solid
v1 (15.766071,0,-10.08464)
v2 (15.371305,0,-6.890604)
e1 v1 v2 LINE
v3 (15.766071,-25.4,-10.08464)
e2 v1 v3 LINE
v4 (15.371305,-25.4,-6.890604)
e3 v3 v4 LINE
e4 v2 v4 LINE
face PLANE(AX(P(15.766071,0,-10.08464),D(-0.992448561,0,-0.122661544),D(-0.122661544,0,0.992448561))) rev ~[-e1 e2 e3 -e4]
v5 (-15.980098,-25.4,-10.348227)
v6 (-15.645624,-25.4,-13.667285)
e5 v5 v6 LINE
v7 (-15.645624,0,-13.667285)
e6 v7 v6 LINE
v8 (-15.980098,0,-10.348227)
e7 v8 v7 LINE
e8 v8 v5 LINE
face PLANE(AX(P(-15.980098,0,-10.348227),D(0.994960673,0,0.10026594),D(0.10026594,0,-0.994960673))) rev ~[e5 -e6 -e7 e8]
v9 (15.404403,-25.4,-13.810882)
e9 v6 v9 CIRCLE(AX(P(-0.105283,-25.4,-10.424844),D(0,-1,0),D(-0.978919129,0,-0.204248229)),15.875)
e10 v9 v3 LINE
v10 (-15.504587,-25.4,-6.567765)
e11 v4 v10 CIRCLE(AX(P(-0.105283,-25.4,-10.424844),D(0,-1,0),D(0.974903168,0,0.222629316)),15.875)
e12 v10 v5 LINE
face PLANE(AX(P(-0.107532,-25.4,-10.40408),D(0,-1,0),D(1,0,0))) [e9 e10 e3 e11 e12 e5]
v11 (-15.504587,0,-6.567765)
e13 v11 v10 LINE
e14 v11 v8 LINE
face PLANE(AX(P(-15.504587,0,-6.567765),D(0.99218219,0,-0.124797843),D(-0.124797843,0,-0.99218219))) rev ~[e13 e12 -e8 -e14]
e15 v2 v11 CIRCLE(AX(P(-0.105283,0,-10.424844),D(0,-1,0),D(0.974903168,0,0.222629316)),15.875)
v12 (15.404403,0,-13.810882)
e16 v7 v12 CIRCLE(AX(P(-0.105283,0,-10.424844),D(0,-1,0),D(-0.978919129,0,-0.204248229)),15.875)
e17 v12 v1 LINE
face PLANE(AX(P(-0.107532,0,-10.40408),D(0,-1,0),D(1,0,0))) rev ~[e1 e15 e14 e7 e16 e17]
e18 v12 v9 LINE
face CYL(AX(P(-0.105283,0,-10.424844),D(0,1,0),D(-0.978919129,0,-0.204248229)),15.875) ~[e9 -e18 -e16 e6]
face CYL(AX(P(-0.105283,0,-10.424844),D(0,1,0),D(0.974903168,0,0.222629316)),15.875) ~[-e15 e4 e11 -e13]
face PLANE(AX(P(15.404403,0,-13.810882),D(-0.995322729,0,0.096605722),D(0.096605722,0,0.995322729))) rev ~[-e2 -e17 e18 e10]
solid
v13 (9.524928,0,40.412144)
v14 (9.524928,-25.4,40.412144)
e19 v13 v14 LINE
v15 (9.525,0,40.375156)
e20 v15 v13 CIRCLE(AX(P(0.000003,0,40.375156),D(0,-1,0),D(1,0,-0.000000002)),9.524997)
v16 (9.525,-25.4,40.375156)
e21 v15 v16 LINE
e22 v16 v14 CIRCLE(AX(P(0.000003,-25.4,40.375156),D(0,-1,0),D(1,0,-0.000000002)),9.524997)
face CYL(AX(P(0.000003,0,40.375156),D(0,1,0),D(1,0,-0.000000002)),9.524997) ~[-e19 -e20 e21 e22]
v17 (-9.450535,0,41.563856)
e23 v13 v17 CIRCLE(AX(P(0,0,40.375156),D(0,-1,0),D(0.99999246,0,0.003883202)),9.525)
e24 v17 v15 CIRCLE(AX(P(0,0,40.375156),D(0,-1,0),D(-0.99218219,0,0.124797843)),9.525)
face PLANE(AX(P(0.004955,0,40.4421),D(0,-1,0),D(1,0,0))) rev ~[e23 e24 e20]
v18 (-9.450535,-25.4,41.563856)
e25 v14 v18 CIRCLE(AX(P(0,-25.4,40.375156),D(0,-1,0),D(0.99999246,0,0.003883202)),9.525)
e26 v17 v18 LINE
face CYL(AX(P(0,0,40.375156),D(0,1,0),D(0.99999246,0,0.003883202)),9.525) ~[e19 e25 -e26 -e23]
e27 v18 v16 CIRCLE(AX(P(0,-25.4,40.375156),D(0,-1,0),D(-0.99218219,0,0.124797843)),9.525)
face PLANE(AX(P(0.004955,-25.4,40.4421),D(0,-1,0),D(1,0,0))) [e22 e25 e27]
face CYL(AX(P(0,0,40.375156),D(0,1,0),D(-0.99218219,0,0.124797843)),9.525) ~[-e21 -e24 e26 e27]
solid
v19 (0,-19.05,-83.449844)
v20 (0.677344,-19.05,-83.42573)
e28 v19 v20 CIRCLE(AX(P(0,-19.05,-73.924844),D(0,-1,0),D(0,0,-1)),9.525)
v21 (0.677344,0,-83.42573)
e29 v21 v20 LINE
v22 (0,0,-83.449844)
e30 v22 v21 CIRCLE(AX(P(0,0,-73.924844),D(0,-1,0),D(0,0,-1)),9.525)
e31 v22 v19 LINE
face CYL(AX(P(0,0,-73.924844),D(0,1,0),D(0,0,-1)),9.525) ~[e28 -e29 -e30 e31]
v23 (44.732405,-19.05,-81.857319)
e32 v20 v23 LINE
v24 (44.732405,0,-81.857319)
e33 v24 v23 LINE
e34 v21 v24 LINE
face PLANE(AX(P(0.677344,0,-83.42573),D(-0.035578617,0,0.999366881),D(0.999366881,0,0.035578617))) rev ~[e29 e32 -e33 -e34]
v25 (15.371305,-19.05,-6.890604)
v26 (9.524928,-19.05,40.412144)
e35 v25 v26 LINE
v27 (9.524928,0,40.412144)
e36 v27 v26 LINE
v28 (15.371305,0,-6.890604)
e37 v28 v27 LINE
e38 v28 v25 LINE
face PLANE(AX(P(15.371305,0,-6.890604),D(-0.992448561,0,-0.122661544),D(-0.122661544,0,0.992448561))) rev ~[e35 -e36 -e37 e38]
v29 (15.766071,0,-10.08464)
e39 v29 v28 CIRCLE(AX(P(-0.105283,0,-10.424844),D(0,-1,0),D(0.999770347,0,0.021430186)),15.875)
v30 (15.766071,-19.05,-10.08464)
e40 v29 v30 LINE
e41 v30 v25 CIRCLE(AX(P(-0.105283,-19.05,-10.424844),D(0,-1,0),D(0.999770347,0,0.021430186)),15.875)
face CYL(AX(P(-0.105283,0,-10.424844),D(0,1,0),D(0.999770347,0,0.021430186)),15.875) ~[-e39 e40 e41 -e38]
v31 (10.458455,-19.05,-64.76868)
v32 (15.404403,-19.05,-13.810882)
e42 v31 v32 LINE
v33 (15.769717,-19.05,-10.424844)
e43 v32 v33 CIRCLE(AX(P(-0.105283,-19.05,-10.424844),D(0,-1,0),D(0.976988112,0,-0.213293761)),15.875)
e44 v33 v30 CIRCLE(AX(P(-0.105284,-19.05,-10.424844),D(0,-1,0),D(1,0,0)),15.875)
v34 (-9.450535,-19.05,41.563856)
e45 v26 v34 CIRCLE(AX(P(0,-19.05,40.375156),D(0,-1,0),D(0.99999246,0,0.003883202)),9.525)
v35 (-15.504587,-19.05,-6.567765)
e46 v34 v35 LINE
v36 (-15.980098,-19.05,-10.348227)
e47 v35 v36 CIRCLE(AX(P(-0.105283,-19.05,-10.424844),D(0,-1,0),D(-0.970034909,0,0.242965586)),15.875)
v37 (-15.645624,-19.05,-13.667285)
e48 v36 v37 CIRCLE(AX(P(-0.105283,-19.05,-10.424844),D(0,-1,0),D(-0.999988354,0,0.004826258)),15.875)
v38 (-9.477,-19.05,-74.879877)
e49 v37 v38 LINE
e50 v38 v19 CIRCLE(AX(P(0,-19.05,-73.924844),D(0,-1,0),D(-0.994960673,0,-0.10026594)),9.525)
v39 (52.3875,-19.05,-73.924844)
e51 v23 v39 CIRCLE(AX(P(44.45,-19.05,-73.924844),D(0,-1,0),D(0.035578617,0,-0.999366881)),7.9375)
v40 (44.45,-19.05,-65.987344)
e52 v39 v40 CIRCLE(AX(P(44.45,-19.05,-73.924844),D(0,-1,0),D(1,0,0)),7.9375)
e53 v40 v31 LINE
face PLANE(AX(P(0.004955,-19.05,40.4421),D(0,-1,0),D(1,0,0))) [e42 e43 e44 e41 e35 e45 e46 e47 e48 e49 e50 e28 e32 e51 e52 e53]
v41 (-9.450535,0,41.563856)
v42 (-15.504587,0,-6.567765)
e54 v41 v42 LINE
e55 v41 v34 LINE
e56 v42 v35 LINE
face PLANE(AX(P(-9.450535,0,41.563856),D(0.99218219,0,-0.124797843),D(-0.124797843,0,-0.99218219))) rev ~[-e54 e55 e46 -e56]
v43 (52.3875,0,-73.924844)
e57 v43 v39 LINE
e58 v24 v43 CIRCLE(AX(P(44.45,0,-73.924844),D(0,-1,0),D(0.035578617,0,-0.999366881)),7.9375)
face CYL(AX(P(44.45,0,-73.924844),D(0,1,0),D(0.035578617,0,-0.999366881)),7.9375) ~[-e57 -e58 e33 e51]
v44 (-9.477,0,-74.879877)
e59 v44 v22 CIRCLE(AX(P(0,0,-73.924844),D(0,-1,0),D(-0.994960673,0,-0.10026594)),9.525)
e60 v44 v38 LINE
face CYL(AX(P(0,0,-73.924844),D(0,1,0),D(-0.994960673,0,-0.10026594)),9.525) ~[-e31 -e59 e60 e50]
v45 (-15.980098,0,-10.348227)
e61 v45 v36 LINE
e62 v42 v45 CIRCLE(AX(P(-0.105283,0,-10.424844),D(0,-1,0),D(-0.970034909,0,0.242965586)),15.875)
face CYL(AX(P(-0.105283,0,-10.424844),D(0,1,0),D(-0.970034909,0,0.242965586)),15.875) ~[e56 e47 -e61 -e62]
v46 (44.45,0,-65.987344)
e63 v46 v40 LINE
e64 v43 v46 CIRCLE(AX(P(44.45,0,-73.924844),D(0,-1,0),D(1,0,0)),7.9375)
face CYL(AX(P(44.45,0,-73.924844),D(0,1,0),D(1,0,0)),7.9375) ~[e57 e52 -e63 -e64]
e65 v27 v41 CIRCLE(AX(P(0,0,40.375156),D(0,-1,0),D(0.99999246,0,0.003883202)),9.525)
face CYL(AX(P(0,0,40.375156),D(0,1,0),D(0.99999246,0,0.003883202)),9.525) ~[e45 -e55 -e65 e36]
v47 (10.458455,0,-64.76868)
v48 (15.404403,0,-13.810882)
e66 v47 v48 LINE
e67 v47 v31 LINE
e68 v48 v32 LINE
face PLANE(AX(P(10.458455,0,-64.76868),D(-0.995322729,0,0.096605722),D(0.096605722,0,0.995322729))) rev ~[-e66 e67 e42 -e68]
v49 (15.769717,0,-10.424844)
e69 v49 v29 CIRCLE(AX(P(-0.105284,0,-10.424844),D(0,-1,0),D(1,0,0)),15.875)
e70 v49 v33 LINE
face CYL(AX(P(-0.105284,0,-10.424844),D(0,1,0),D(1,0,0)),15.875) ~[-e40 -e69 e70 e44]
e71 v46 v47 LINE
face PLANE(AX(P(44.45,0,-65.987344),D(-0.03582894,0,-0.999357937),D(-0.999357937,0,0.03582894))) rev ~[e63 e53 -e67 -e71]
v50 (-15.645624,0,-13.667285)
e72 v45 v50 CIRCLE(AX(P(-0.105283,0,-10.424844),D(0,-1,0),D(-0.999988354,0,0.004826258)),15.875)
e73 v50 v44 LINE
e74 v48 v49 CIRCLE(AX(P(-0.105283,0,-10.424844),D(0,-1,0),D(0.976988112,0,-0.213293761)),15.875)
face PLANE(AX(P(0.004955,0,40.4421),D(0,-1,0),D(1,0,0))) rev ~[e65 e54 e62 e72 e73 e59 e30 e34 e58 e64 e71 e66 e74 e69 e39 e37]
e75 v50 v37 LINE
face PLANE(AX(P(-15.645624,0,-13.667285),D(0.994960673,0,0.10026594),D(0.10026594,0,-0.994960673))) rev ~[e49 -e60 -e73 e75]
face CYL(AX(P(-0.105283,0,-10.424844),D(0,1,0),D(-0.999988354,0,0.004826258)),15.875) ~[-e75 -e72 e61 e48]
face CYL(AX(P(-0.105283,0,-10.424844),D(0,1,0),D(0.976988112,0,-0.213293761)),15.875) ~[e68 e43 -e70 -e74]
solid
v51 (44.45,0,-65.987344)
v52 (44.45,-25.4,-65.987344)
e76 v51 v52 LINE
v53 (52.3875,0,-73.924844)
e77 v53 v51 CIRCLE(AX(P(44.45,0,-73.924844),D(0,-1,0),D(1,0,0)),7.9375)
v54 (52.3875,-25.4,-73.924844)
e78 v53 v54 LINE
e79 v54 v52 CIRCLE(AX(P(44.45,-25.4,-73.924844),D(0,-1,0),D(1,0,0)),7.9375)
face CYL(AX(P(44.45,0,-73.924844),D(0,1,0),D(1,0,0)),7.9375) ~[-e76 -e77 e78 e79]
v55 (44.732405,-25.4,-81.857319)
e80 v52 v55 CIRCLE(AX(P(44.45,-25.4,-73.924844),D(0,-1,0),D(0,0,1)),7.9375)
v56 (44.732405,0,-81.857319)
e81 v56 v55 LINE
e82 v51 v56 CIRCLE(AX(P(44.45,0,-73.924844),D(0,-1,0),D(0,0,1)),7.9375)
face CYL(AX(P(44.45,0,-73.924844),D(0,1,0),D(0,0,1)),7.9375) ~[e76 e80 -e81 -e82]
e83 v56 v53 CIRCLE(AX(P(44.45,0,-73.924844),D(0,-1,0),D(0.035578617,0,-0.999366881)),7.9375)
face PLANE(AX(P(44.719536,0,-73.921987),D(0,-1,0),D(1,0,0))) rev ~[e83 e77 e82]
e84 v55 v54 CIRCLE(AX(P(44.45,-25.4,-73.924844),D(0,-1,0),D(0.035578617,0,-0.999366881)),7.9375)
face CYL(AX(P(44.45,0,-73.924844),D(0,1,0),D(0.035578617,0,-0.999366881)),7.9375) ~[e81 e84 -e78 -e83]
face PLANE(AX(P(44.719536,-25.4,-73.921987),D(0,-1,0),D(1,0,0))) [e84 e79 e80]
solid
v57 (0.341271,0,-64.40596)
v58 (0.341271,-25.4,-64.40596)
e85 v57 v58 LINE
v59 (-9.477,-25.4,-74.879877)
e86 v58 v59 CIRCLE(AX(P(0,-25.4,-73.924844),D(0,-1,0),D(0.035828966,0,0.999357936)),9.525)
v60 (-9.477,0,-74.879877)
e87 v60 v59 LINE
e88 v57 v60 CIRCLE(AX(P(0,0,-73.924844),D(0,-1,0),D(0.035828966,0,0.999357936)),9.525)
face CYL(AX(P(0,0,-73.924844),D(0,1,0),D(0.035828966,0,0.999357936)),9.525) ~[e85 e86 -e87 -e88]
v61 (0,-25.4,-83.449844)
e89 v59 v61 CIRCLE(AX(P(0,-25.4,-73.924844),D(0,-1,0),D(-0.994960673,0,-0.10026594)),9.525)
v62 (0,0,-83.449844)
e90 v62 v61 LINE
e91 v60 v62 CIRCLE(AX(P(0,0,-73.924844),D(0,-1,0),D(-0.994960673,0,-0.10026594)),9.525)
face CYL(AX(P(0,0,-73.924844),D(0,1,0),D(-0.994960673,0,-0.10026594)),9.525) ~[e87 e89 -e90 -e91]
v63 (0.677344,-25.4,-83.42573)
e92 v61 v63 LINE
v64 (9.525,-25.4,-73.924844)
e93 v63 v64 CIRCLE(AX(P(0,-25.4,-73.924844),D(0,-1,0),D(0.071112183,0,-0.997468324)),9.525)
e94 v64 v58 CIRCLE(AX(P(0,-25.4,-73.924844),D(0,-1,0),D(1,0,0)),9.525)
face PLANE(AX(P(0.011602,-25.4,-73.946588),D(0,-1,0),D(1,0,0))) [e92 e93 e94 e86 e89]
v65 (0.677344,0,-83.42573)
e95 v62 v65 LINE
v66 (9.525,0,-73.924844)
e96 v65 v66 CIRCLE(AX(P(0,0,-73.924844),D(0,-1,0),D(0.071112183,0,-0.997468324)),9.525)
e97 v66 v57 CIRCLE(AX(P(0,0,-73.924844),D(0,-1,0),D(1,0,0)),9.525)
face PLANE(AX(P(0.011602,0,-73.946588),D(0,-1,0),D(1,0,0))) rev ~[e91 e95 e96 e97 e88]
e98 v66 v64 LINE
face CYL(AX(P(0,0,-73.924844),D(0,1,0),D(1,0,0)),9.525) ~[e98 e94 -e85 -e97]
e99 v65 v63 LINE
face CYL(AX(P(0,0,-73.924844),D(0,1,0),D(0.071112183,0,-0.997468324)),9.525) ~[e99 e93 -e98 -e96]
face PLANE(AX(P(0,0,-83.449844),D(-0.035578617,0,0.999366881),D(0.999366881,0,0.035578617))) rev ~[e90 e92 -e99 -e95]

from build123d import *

# Parameters (mm, degrees)
F1_DEPTH = 25.4
F2_DEPTH = 19.05


with BuildPart() as f1:
    # F0 (on Front) → F1 (new body)
    with BuildSketch(Plane.XZ):
        with BuildLine():
            ThreePointArc((-9.4505353604, 41.5638555321), (-0.5955147738, 30.8687904621), (9.525, 40.3751560744))
            ThreePointArc((9.525, 40.3751560744), (9.5249820462, 40.3936498602), (9.5249281848, 40.4121435763))
            ThreePointArc((9.5249281848, 40.4121435763), (0.5770560461, 49.8826600223), (-9.4505353604, 41.5638555321))
        make_face()
    extrude(amount=F1_DEPTH)


with BuildPart() as f1b:
    # F0 (on Front) → F1, piece 2 (new body)
    with BuildSketch(Plane.XZ):
        with BuildLine():
            Line((15.7660711788, -10.0846397195), (15.371304716, -6.8906035395))
            ThreePointArc((15.371304716, -6.8906035395), (0.0606968294, 5.4492883552), (-15.5045872563, -6.5677652421))
            Line((-15.5045872563, -6.5677652421), (-15.9800981954, -10.3482270861))
            Line((-15.9800981954, -10.3482270861), (-15.6456242534, -13.6672845653))
            ThreePointArc((-15.6456242534, -13.6672845653), (-0.1786997991, -26.2996741605), (15.4044031981, -13.810882388))
            Line((15.4044031981, -13.810882388), (15.7660711788, -10.0846397195))
        make_face()
    extrude(amount=F1_DEPTH)


with BuildPart() as f1c:
    # F0 (on Front) → F1, piece 3 (new body)
    with BuildSketch(Plane.XZ):
        with BuildLine():
            ThreePointArc((0.3412708989, -64.4059595806), (-6.9491816059, -67.4106670775), (-9.4770004124, -74.8798770055))
            ThreePointArc((-9.4770004124, -74.8798770055), (-6.3886201528, -80.989626834), (0, -83.4498439256))
            Line((0, -83.4498439256), (0.6773435479, -83.4257297116))
            ThreePointArc((0.6773435479, -83.4257297116), (6.9705567315, -80.4161430139), (9.525, -73.9248439256))
            ThreePointArc((9.525, -73.9248439256), (6.8547877543, -67.3114098824), (0.3412708989, -64.4059595806))
        make_face()
    extrude(amount=F1_DEPTH)


with BuildPart() as f1d:
    # F0 (on Front) → F1, piece 4 (new body)
    with BuildSketch(Plane.XZ):
        with BuildLine():
            ThreePointArc((52.3875, -73.9248439256), (50.0626600757, -68.31218385), (44.45, -65.9873439256))
            ThreePointArc((44.45, -65.9873439256), (36.5137564458, -74.0660689178), (44.7324052746, -81.8573185402))
            ThreePointArc((44.7324052746, -81.8573185402), (50.1616327839, -79.4367544104), (52.3875, -73.9248439256))
        make_face()
    extrude(amount=F1_DEPTH)


with BuildPart() as f2:
    # F0 (on Front) → F2 (new body)
    with BuildSketch(Plane.XZ):
        with BuildLine():
            ThreePointArc((-9.4505353604, 41.5638555321), (-0.5955147738, 30.8687904621), (9.525, 40.3751560744))
            ThreePointArc((9.525, 40.3751560744), (9.5249820462, 40.3936498602), (9.5249281848, 40.4121435763))
            ThreePointArc((9.5249281848, 40.4121435763), (0.5770560461, 49.8826600223), (-9.4505353604, 41.5638555321))
        make_face()
        with BuildLine():
            ThreePointArc((9.5249281848, 40.4121435763), (9.5249820462, 40.3936498602), (9.525, 40.3751560744))
            ThreePointArc((9.525, 40.3751560744), (-0.5955147738, 30.8687904621), (-9.4505353604, 41.5638555321))
            Line((-9.4505353604, 41.5638555321), (-15.5045872563, -6.5677652421))
            ThreePointArc((-15.5045872563, -6.5677652421), (0.0606968294, 5.4492883552), (15.371304716, -6.8906035395))
            Line((15.371304716, -6.8906035395), (9.5249281848, 40.4121435763))
        make_face()
        with BuildLine():
            Line((15.7660711788, -10.0846397195), (15.371304716, -6.8906035395))
            ThreePointArc((15.371304716, -6.8906035395), (0.0606968294, 5.4492883552), (-15.5045872563, -6.5677652421))
            Line((-15.5045872563, -6.5677652421), (-15.9800981954, -10.3482270861))
            Line((-15.9800981954, -10.3482270861), (-15.6456242534, -13.6672845653))
            ThreePointArc((-15.6456242534, -13.6672845653), (-0.1786997991, -26.2996741605), (15.4044031981, -13.810882388))
            Line((15.4044031981, -13.810882388), (15.7660711788, -10.0846397195))
        make_face()
        with BuildLine():
            ThreePointArc((15.7660711788, -10.0846397195), (15.6498378192, -8.4775919222), (15.371304716, -6.8906035395))
            Line((15.371304716, -6.8906035395), (15.7660711788, -10.0846397195))
        make_face()
        with BuildLine():
            Line((-15.9800981954, -10.3482270861), (-15.5045872563, -6.5677652421))
            ThreePointArc((-15.5045872563, -6.5677652421), (-15.8561753502, -8.4436781627), (-15.9800981954, -10.3482270861))
        make_face()
        with BuildLine():
            ThreePointArc((15.7697169172, -10.4248439256), (15.7688054564, -10.2547320556), (15.7660711788, -10.0846397195))
            Line((15.7660711788, -10.0846397195), (15.4044031981, -13.810882388))
            ThreePointArc((15.4044031981, -13.810882388), (15.6781242602, -12.127687913), (15.7697169172, -10.4248439256))
        make_face()
        with BuildLine():
            Line((-15.6456242534, -13.6672845653), (-15.9800981954, -10.3482270861))
            ThreePointArc((-15.9800981954, -10.3482270861), (-15.9002837701, -12.0165657254), (-15.6456242534, -13.6672845653))
        make_face()
        with BuildLine():
            Line((10.4584548085, -64.7686804428), (15.4044031981, -13.810882388))
            ThreePointArc((15.4044031981, -13.810882388), (-0.1786997991, -26.2996741605), (-15.6456242534, -13.6672845653))
            Line((-15.6456242534, -13.6672845653), (-9.4770004124, -74.8798770055))
            ThreePointArc((-9.4770004124, -74.8798770055), (-6.9491816059, -67.4106670775), (0.3412708989, -64.4059595806))
            Line((0.3412708989, -64.4059595806), (10.4584548085, -64.7686804428))
        make_face()
        with BuildLine():
            Line((44.45, -65.9873439256), (10.4584548085, -64.7686804428))
            Line((10.4584548085, -64.7686804428), (0.3412708989, -64.4059595806))
            ThreePointArc((0.3412708989, -64.4059595806), (6.8547877543, -67.3114098824), (9.525, -73.9248439256))
            ThreePointArc((9.525, -73.9248439256), (6.9705567315, -80.4161430139), (0.6773435479, -83.4257297116))
            Line((0.6773435479, -83.4257297116), (44.7324052746, -81.8573185402))
            ThreePointArc((44.7324052746, -81.8573185402), (36.5137564458, -74.0660689178), (44.45, -65.9873439256))
        make_face()
        with BuildLine():
            ThreePointArc((0.3412708989, -64.4059595806), (-6.9491816059, -67.4106670775), (-9.4770004124, -74.8798770055))
            ThreePointArc((-9.4770004124, -74.8798770055), (-6.3886201528, -80.989626834), (0, -83.4498439256))
            Line((0, -83.4498439256), (0.6773435479, -83.4257297116))
            ThreePointArc((0.6773435479, -83.4257297116), (6.9705567315, -80.4161430139), (9.525, -73.9248439256))
            ThreePointArc((9.525, -73.9248439256), (6.8547877543, -67.3114098824), (0.3412708989, -64.4059595806))
        make_face()
        with BuildLine():
            ThreePointArc((52.3875, -73.9248439256), (50.0626600757, -68.31218385), (44.45, -65.9873439256))
            ThreePointArc((44.45, -65.9873439256), (36.5137564458, -74.0660689178), (44.7324052746, -81.8573185402))
            ThreePointArc((44.7324052746, -81.8573185402), (50.1616327839, -79.4367544104), (52.3875, -73.9248439256))
        make_face()
        with BuildLine():
            Line((0.6773435479, -83.4257297116), (0, -83.4498439256))
            ThreePointArc((0, -83.4498439256), (0.3388863295, -83.4438134631), (0.6773435479, -83.4257297116))
        make_face()
    extrude(amount=F2_DEPTH)


solid = Compound([f1.part, f1b.part, f1c.part, f1d.part, f2.part])
